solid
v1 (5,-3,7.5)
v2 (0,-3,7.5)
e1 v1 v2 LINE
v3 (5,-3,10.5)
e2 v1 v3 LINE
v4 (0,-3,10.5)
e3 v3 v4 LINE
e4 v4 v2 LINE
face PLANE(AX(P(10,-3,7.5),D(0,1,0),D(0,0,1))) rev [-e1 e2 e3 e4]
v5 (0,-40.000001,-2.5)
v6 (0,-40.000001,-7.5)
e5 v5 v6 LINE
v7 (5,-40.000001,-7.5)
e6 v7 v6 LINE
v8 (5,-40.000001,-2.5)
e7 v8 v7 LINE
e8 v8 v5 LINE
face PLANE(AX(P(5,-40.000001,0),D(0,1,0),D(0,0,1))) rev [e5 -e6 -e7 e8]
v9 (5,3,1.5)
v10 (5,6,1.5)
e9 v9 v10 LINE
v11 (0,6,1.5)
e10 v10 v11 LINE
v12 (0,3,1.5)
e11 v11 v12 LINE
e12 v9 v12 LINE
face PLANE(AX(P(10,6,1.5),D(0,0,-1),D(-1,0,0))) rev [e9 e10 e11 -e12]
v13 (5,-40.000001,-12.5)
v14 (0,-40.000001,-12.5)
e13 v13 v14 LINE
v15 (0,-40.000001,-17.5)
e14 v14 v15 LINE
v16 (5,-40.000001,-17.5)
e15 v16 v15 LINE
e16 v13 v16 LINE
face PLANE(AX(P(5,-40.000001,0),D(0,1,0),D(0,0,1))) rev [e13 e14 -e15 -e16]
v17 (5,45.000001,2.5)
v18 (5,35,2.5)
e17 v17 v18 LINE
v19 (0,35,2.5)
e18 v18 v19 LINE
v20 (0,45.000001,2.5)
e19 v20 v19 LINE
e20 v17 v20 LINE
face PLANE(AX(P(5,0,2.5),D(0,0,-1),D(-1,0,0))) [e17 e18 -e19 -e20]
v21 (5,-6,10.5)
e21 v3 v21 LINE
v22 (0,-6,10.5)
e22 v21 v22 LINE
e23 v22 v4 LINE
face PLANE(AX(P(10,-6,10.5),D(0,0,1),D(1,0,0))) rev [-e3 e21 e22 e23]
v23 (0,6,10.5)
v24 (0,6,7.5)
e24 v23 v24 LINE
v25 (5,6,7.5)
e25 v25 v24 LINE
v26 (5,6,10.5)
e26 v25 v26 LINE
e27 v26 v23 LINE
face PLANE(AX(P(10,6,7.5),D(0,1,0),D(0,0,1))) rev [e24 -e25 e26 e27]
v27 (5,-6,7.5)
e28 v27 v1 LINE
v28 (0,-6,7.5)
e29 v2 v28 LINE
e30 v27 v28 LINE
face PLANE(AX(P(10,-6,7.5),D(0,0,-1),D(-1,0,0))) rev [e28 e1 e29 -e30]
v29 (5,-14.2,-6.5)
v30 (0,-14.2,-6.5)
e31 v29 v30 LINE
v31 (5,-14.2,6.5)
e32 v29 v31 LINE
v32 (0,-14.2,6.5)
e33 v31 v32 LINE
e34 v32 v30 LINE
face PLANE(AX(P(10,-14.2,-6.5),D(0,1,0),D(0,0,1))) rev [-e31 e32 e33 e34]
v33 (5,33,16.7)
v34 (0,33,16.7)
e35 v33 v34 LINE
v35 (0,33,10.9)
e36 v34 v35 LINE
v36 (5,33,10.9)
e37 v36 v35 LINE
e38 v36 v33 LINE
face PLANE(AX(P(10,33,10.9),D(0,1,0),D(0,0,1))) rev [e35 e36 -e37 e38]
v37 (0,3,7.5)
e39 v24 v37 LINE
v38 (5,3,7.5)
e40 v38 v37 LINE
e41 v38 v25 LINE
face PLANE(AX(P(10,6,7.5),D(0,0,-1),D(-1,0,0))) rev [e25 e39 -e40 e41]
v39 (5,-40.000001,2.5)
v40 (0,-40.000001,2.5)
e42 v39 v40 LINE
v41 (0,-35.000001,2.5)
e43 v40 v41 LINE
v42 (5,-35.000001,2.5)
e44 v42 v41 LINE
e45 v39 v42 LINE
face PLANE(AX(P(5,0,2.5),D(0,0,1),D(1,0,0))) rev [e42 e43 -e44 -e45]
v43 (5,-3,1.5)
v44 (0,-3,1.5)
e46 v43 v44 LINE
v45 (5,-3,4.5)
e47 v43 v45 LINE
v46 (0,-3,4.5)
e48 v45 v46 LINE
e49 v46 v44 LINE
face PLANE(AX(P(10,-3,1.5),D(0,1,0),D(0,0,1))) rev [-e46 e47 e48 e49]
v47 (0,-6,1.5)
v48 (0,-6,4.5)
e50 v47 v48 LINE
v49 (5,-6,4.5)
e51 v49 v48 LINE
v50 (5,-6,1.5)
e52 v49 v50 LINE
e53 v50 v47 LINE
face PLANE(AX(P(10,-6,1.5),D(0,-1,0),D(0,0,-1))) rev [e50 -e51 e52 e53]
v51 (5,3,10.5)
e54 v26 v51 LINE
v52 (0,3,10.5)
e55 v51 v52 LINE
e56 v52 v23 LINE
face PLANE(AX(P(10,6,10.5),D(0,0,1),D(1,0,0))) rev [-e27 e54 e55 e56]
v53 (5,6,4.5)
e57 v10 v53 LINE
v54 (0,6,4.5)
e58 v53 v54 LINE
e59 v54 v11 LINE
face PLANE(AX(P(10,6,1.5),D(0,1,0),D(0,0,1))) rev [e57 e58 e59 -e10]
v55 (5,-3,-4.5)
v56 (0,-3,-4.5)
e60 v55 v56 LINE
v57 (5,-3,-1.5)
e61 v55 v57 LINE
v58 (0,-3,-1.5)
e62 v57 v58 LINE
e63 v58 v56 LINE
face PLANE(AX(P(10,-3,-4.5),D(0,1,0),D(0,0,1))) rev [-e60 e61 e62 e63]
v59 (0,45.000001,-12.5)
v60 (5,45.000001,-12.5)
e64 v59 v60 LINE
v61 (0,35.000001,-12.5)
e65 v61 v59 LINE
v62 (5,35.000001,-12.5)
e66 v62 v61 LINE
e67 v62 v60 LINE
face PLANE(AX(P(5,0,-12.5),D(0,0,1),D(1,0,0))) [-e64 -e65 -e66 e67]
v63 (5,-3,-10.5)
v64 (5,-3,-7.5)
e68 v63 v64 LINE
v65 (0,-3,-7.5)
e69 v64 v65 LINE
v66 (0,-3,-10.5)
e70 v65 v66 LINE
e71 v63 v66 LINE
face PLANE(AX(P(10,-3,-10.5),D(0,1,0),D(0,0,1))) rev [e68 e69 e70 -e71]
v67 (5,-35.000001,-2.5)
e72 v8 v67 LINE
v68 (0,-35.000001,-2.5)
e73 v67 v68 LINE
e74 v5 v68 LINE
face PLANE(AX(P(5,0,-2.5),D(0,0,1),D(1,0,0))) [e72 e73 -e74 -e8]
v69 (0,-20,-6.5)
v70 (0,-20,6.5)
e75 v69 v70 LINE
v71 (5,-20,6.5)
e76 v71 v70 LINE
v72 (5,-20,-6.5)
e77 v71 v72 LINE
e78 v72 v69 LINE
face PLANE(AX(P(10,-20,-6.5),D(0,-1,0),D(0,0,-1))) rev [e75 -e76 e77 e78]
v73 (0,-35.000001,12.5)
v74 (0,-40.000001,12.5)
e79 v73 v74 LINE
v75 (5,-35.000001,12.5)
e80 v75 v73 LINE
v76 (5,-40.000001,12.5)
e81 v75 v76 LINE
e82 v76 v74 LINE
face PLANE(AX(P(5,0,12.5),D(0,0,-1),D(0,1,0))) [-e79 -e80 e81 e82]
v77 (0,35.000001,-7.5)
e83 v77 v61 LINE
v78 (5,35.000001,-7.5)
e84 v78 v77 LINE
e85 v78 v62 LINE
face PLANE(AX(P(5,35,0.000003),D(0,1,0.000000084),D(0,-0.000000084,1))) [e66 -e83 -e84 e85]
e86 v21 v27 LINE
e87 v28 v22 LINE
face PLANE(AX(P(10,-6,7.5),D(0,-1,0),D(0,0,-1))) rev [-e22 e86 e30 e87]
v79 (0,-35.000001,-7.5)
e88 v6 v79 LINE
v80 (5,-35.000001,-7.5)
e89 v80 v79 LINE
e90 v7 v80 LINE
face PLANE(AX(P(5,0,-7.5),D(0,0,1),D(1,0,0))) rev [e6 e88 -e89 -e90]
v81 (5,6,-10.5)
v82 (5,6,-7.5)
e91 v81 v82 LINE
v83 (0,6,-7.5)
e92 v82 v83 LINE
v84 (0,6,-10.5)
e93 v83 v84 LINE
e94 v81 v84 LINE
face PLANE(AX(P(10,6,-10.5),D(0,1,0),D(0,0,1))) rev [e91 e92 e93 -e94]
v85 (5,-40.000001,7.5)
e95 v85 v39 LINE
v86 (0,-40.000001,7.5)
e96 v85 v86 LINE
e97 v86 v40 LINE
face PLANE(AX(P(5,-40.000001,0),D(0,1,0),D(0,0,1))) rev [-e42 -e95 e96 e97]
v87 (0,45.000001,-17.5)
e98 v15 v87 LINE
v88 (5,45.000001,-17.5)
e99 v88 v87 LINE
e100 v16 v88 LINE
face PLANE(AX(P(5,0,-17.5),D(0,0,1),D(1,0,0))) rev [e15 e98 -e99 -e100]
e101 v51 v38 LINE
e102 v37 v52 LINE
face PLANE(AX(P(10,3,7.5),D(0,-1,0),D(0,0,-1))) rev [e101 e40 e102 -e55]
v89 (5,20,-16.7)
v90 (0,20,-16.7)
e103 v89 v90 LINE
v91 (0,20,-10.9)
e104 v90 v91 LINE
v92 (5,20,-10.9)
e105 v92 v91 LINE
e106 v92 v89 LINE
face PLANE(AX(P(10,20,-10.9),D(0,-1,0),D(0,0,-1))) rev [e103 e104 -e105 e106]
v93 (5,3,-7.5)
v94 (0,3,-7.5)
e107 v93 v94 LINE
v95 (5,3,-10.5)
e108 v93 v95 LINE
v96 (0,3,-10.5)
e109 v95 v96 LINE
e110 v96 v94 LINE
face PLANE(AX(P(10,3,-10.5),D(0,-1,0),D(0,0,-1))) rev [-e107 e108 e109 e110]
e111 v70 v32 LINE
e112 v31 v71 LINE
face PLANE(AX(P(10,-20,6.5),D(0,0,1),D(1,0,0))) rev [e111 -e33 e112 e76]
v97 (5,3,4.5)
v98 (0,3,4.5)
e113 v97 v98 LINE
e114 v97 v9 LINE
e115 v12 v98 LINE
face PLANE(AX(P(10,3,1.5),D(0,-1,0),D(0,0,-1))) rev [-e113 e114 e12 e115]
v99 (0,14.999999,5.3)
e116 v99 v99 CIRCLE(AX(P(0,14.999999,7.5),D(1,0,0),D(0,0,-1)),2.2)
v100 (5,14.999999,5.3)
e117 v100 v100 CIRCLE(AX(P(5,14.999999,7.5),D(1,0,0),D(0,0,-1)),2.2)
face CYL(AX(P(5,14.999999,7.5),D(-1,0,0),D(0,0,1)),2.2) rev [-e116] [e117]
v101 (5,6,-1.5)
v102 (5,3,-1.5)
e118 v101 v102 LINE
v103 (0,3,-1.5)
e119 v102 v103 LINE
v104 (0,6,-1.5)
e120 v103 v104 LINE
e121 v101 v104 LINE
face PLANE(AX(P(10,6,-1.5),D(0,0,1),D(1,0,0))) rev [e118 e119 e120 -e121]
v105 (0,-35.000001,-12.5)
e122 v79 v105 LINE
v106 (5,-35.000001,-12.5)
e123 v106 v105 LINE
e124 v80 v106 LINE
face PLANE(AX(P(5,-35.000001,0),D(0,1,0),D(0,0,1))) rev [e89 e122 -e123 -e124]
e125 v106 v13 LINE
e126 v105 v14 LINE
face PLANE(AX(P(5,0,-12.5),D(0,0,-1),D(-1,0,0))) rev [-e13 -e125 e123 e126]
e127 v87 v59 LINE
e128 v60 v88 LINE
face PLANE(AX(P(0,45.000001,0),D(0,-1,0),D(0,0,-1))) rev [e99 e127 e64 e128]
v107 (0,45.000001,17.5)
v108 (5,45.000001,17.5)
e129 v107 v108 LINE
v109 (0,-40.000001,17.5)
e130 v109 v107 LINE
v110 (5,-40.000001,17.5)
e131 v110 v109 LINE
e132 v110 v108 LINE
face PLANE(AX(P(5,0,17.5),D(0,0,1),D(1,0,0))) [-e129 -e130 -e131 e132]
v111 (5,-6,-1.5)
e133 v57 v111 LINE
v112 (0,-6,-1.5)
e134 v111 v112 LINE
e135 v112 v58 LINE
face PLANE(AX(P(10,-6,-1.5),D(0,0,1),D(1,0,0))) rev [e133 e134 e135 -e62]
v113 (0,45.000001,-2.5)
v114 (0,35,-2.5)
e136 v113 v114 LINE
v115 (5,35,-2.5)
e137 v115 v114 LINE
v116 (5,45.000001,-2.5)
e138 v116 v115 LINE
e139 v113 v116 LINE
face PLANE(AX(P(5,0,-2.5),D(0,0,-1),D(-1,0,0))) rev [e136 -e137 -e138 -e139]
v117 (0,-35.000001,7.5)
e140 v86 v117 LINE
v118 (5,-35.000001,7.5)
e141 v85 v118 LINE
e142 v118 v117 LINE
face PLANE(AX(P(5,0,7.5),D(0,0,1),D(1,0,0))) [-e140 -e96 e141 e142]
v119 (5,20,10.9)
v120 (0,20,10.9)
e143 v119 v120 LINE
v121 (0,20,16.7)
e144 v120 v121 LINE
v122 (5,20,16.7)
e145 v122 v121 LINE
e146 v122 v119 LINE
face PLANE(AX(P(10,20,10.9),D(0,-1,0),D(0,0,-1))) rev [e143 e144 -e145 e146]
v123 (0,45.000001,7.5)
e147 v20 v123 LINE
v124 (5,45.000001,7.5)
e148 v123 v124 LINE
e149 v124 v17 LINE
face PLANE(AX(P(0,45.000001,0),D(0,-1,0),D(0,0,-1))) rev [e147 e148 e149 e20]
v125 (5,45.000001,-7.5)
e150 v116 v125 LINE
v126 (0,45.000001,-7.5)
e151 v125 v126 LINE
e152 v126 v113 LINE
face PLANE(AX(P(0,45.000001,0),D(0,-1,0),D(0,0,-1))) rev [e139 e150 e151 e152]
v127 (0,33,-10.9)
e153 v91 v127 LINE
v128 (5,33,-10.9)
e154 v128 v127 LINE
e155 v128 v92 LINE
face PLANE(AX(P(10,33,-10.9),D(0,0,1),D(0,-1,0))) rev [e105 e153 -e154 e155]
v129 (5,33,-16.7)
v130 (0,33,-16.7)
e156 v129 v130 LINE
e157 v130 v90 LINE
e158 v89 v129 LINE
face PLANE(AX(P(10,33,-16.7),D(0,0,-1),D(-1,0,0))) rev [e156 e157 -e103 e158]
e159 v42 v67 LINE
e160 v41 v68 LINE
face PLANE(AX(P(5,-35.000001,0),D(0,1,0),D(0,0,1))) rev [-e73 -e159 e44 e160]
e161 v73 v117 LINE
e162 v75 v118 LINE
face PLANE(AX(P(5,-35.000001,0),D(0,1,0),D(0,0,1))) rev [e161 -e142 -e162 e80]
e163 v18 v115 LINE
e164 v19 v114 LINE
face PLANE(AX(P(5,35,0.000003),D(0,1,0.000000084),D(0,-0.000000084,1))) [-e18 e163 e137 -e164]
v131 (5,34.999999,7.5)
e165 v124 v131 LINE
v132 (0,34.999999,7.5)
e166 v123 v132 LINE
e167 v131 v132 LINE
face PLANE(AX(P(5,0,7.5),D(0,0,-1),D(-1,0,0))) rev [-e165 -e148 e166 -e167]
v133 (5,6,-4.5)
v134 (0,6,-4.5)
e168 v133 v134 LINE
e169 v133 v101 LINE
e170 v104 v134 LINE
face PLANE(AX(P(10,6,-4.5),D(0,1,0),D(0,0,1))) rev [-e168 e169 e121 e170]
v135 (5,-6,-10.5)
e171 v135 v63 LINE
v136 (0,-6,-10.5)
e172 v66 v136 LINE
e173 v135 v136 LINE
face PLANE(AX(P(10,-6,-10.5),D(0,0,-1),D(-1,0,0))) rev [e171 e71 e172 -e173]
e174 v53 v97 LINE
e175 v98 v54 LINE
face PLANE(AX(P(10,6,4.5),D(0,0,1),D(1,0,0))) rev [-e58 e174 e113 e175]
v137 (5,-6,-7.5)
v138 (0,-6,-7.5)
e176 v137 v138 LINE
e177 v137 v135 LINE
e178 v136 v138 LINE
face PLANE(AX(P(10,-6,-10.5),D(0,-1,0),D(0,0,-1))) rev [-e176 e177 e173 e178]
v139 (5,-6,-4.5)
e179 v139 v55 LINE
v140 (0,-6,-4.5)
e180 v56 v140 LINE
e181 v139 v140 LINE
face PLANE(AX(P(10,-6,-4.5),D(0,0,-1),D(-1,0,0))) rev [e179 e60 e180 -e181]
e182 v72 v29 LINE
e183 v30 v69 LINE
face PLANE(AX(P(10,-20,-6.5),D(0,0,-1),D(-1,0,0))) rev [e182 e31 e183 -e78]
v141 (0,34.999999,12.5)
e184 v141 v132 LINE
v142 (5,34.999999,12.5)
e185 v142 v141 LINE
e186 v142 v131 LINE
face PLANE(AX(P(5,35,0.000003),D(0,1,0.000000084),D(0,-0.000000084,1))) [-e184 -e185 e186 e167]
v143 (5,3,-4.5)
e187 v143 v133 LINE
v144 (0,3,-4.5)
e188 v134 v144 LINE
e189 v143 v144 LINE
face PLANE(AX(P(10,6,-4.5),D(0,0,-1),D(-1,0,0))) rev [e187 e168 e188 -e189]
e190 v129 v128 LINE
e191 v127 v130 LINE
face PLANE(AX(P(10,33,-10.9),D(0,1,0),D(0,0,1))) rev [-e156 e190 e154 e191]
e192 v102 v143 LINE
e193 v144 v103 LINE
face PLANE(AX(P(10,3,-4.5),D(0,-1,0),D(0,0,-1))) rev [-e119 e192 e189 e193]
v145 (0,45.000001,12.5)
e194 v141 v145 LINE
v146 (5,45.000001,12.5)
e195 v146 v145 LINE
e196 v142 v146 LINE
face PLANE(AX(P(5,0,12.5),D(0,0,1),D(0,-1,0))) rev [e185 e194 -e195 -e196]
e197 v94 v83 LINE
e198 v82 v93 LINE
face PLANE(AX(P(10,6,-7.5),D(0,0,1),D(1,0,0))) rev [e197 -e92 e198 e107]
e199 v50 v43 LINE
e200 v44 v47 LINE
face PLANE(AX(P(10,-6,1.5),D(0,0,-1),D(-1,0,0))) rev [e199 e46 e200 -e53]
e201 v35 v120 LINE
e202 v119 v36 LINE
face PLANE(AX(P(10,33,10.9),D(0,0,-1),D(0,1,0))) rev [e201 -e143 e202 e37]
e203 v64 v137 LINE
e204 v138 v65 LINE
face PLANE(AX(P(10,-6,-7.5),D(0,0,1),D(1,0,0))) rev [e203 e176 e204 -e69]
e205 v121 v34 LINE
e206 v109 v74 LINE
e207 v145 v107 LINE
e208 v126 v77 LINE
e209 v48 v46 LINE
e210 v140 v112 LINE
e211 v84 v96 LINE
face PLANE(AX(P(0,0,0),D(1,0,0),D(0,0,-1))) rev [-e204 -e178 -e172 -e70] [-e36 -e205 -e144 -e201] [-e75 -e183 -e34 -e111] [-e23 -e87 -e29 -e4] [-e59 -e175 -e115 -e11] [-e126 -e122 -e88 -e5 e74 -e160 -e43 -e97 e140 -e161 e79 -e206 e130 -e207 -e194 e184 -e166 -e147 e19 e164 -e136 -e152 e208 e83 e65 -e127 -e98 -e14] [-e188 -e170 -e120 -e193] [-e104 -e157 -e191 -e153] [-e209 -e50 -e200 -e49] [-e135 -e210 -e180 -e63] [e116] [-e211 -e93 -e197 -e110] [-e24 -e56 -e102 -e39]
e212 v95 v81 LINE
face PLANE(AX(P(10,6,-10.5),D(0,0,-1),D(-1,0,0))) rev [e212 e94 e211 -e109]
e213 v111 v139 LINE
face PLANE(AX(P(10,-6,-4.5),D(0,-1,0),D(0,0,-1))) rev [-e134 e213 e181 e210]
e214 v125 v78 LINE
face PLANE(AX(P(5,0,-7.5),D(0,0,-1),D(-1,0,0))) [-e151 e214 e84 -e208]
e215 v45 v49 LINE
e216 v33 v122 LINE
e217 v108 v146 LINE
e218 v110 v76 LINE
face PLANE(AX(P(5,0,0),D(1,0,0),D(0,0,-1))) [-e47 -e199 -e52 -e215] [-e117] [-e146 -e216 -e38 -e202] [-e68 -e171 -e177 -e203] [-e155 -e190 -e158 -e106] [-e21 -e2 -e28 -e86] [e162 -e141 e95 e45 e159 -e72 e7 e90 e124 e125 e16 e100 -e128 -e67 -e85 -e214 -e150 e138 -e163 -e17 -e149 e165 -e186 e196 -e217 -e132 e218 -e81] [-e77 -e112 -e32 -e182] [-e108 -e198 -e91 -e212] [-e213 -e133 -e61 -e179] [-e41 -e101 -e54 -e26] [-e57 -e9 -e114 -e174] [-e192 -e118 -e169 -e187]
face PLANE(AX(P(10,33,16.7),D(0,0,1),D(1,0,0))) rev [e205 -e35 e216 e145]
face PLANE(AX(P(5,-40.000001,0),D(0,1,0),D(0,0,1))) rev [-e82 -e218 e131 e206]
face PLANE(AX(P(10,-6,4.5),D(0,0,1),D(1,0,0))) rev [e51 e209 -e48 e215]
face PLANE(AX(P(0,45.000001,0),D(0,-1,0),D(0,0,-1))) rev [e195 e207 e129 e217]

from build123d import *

# Parameters (mm, degrees)
BOSS_EXTRU_1_OUTLINE_R  = 2.2
BOSS_EXTRU_1_DEPTH      = 5
ESQUISSE3_W             = 5
ESQUISSE3_H             = 5
BOSS_EXTRU_3_DEPTH      = 5
ESQUISSE4_W             = 3
ESQUISSE4_H             = 3
ENL_V_MAT_EXTRU_1_DEPTH = 10
ESQUISSE6_W             = 13
ESQUISSE6_H             = 5.8
ENL_V_MAT_EXTRU_2_DEPTH = 10
ESQUISSE7_W             = 5.8
ESQUISSE7_H             = 13
ENL_V_MAT_EXTRU_3_DEPTH = 10


# Read off the part's stored shape, not the designer's step: Boss.-Extru.1
with BuildPart() as part:
    # Boss.-Extru.1 outline → Boss.-Extru.1 (new body)
    with BuildSketch(Plane(origin=(0, 0, 0), x_dir=(0, 0, -1), z_dir=(1, 0, 0))):
        Polygon((-12.5, 40.000001465), (-17.5, 40.000001465), (-17.5, -40.000001465), (-12.5, -40.000001465), (-12.5, -35.000001465), (-7.5, -35.000001465), (-7.5, -40.000001465), (-2.5, -40.000001465), (-2.5, -35.000001465), (2.5, -35.000001465), (2.5, -40.000001465), (7.5, -40.000001465), (7.5, -35.000001465), (12.5, -35.000001465), (12.5, -40.000001465), (17.5, -40.000001465), (17.5, 40.000001465), (12.5, 40.000001465), (12.5, 35.000001047), (7.5, 35.000000628), (7.5, 40.000001465), (2.5, 40.000001465), (2.5, 35.000000209), (-2.5, 34.999999791), (-2.5, 40.000001465), (-7.5, 40.000001465), (-7.5, 34.999999372), (-12.5, 34.999998953), align=None)
        with Locations((-7.5, 14.999999372)):
            Circle(BOSS_EXTRU_1_OUTLINE_R, mode=Mode.SUBTRACT)
    extrude(amount=BOSS_EXTRU_1_DEPTH)

    # Esquisse3 → Boss.-Extru.3 (add)
    with BuildSketch(Plane(origin=(0, 40.000001465, 0), x_dir=(1, 0, 0), z_dir=(0, 1, 0))):
        with Locations((2.5, -15)):
            Rectangle(ESQUISSE3_W, ESQUISSE3_H)
        with Locations((2.5, -5)):
            Rectangle(ESQUISSE3_W, ESQUISSE3_H)
        with Locations((2.5, 5)):
            Rectangle(ESQUISSE3_W, ESQUISSE3_H)
        with Locations((2.5, 15)):
            Rectangle(ESQUISSE3_W, ESQUISSE3_H)
    extrude(amount=BOSS_EXTRU_3_DEPTH)

    # Esquisse4 → Enlèv. mat.-Extru.1 (cut)
    with BuildSketch(Plane.ZY):
        with Locations((-3, -4.5)):
            Rectangle(ESQUISSE4_W, ESQUISSE4_H)
        with Locations((-9, -4.5)):
            Rectangle(ESQUISSE4_W, ESQUISSE4_H)
        with Locations((3, -4.5)):
            Rectangle(ESQUISSE4_W, ESQUISSE4_H)
        with Locations((9, -4.5)):
            Rectangle(ESQUISSE4_W, ESQUISSE4_H)
        with Locations((9, 4.5)):
            Rectangle(ESQUISSE4_W, ESQUISSE4_H)
        with Locations((3, 4.5)):
            Rectangle(ESQUISSE4_W, ESQUISSE4_H)
        with Locations((-3, 4.5)):
            Rectangle(ESQUISSE4_W, ESQUISSE4_H)
        with Locations((-9, 4.5)):
            Rectangle(ESQUISSE4_W, ESQUISSE4_H)
    extrude(amount=-ENL_V_MAT_EXTRU_1_DEPTH, mode=Mode.SUBTRACT)

    # Esquisse6 → Enlèv. mat.-Extru.2 (cut)
    with BuildSketch(Plane.ZY):
        with Locations((0, -17.1)):
            Rectangle(ESQUISSE6_W, ESQUISSE6_H)
    extrude(amount=-ENL_V_MAT_EXTRU_2_DEPTH, mode=Mode.SUBTRACT)

    # Esquisse7 → Enlèv. mat.-Extru.3 (cut)
    with BuildSketch(Plane.ZY):
        with Locations((-13.8, 26.5)):
            Rectangle(ESQUISSE7_W, ESQUISSE7_H)
        with Locations((13.8, 26.5)):
            Rectangle(ESQUISSE7_W, ESQUISSE7_H)
    extrude(amount=-ENL_V_MAT_EXTRU_3_DEPTH, mode=Mode.SUBTRACT)


solid = part.part
